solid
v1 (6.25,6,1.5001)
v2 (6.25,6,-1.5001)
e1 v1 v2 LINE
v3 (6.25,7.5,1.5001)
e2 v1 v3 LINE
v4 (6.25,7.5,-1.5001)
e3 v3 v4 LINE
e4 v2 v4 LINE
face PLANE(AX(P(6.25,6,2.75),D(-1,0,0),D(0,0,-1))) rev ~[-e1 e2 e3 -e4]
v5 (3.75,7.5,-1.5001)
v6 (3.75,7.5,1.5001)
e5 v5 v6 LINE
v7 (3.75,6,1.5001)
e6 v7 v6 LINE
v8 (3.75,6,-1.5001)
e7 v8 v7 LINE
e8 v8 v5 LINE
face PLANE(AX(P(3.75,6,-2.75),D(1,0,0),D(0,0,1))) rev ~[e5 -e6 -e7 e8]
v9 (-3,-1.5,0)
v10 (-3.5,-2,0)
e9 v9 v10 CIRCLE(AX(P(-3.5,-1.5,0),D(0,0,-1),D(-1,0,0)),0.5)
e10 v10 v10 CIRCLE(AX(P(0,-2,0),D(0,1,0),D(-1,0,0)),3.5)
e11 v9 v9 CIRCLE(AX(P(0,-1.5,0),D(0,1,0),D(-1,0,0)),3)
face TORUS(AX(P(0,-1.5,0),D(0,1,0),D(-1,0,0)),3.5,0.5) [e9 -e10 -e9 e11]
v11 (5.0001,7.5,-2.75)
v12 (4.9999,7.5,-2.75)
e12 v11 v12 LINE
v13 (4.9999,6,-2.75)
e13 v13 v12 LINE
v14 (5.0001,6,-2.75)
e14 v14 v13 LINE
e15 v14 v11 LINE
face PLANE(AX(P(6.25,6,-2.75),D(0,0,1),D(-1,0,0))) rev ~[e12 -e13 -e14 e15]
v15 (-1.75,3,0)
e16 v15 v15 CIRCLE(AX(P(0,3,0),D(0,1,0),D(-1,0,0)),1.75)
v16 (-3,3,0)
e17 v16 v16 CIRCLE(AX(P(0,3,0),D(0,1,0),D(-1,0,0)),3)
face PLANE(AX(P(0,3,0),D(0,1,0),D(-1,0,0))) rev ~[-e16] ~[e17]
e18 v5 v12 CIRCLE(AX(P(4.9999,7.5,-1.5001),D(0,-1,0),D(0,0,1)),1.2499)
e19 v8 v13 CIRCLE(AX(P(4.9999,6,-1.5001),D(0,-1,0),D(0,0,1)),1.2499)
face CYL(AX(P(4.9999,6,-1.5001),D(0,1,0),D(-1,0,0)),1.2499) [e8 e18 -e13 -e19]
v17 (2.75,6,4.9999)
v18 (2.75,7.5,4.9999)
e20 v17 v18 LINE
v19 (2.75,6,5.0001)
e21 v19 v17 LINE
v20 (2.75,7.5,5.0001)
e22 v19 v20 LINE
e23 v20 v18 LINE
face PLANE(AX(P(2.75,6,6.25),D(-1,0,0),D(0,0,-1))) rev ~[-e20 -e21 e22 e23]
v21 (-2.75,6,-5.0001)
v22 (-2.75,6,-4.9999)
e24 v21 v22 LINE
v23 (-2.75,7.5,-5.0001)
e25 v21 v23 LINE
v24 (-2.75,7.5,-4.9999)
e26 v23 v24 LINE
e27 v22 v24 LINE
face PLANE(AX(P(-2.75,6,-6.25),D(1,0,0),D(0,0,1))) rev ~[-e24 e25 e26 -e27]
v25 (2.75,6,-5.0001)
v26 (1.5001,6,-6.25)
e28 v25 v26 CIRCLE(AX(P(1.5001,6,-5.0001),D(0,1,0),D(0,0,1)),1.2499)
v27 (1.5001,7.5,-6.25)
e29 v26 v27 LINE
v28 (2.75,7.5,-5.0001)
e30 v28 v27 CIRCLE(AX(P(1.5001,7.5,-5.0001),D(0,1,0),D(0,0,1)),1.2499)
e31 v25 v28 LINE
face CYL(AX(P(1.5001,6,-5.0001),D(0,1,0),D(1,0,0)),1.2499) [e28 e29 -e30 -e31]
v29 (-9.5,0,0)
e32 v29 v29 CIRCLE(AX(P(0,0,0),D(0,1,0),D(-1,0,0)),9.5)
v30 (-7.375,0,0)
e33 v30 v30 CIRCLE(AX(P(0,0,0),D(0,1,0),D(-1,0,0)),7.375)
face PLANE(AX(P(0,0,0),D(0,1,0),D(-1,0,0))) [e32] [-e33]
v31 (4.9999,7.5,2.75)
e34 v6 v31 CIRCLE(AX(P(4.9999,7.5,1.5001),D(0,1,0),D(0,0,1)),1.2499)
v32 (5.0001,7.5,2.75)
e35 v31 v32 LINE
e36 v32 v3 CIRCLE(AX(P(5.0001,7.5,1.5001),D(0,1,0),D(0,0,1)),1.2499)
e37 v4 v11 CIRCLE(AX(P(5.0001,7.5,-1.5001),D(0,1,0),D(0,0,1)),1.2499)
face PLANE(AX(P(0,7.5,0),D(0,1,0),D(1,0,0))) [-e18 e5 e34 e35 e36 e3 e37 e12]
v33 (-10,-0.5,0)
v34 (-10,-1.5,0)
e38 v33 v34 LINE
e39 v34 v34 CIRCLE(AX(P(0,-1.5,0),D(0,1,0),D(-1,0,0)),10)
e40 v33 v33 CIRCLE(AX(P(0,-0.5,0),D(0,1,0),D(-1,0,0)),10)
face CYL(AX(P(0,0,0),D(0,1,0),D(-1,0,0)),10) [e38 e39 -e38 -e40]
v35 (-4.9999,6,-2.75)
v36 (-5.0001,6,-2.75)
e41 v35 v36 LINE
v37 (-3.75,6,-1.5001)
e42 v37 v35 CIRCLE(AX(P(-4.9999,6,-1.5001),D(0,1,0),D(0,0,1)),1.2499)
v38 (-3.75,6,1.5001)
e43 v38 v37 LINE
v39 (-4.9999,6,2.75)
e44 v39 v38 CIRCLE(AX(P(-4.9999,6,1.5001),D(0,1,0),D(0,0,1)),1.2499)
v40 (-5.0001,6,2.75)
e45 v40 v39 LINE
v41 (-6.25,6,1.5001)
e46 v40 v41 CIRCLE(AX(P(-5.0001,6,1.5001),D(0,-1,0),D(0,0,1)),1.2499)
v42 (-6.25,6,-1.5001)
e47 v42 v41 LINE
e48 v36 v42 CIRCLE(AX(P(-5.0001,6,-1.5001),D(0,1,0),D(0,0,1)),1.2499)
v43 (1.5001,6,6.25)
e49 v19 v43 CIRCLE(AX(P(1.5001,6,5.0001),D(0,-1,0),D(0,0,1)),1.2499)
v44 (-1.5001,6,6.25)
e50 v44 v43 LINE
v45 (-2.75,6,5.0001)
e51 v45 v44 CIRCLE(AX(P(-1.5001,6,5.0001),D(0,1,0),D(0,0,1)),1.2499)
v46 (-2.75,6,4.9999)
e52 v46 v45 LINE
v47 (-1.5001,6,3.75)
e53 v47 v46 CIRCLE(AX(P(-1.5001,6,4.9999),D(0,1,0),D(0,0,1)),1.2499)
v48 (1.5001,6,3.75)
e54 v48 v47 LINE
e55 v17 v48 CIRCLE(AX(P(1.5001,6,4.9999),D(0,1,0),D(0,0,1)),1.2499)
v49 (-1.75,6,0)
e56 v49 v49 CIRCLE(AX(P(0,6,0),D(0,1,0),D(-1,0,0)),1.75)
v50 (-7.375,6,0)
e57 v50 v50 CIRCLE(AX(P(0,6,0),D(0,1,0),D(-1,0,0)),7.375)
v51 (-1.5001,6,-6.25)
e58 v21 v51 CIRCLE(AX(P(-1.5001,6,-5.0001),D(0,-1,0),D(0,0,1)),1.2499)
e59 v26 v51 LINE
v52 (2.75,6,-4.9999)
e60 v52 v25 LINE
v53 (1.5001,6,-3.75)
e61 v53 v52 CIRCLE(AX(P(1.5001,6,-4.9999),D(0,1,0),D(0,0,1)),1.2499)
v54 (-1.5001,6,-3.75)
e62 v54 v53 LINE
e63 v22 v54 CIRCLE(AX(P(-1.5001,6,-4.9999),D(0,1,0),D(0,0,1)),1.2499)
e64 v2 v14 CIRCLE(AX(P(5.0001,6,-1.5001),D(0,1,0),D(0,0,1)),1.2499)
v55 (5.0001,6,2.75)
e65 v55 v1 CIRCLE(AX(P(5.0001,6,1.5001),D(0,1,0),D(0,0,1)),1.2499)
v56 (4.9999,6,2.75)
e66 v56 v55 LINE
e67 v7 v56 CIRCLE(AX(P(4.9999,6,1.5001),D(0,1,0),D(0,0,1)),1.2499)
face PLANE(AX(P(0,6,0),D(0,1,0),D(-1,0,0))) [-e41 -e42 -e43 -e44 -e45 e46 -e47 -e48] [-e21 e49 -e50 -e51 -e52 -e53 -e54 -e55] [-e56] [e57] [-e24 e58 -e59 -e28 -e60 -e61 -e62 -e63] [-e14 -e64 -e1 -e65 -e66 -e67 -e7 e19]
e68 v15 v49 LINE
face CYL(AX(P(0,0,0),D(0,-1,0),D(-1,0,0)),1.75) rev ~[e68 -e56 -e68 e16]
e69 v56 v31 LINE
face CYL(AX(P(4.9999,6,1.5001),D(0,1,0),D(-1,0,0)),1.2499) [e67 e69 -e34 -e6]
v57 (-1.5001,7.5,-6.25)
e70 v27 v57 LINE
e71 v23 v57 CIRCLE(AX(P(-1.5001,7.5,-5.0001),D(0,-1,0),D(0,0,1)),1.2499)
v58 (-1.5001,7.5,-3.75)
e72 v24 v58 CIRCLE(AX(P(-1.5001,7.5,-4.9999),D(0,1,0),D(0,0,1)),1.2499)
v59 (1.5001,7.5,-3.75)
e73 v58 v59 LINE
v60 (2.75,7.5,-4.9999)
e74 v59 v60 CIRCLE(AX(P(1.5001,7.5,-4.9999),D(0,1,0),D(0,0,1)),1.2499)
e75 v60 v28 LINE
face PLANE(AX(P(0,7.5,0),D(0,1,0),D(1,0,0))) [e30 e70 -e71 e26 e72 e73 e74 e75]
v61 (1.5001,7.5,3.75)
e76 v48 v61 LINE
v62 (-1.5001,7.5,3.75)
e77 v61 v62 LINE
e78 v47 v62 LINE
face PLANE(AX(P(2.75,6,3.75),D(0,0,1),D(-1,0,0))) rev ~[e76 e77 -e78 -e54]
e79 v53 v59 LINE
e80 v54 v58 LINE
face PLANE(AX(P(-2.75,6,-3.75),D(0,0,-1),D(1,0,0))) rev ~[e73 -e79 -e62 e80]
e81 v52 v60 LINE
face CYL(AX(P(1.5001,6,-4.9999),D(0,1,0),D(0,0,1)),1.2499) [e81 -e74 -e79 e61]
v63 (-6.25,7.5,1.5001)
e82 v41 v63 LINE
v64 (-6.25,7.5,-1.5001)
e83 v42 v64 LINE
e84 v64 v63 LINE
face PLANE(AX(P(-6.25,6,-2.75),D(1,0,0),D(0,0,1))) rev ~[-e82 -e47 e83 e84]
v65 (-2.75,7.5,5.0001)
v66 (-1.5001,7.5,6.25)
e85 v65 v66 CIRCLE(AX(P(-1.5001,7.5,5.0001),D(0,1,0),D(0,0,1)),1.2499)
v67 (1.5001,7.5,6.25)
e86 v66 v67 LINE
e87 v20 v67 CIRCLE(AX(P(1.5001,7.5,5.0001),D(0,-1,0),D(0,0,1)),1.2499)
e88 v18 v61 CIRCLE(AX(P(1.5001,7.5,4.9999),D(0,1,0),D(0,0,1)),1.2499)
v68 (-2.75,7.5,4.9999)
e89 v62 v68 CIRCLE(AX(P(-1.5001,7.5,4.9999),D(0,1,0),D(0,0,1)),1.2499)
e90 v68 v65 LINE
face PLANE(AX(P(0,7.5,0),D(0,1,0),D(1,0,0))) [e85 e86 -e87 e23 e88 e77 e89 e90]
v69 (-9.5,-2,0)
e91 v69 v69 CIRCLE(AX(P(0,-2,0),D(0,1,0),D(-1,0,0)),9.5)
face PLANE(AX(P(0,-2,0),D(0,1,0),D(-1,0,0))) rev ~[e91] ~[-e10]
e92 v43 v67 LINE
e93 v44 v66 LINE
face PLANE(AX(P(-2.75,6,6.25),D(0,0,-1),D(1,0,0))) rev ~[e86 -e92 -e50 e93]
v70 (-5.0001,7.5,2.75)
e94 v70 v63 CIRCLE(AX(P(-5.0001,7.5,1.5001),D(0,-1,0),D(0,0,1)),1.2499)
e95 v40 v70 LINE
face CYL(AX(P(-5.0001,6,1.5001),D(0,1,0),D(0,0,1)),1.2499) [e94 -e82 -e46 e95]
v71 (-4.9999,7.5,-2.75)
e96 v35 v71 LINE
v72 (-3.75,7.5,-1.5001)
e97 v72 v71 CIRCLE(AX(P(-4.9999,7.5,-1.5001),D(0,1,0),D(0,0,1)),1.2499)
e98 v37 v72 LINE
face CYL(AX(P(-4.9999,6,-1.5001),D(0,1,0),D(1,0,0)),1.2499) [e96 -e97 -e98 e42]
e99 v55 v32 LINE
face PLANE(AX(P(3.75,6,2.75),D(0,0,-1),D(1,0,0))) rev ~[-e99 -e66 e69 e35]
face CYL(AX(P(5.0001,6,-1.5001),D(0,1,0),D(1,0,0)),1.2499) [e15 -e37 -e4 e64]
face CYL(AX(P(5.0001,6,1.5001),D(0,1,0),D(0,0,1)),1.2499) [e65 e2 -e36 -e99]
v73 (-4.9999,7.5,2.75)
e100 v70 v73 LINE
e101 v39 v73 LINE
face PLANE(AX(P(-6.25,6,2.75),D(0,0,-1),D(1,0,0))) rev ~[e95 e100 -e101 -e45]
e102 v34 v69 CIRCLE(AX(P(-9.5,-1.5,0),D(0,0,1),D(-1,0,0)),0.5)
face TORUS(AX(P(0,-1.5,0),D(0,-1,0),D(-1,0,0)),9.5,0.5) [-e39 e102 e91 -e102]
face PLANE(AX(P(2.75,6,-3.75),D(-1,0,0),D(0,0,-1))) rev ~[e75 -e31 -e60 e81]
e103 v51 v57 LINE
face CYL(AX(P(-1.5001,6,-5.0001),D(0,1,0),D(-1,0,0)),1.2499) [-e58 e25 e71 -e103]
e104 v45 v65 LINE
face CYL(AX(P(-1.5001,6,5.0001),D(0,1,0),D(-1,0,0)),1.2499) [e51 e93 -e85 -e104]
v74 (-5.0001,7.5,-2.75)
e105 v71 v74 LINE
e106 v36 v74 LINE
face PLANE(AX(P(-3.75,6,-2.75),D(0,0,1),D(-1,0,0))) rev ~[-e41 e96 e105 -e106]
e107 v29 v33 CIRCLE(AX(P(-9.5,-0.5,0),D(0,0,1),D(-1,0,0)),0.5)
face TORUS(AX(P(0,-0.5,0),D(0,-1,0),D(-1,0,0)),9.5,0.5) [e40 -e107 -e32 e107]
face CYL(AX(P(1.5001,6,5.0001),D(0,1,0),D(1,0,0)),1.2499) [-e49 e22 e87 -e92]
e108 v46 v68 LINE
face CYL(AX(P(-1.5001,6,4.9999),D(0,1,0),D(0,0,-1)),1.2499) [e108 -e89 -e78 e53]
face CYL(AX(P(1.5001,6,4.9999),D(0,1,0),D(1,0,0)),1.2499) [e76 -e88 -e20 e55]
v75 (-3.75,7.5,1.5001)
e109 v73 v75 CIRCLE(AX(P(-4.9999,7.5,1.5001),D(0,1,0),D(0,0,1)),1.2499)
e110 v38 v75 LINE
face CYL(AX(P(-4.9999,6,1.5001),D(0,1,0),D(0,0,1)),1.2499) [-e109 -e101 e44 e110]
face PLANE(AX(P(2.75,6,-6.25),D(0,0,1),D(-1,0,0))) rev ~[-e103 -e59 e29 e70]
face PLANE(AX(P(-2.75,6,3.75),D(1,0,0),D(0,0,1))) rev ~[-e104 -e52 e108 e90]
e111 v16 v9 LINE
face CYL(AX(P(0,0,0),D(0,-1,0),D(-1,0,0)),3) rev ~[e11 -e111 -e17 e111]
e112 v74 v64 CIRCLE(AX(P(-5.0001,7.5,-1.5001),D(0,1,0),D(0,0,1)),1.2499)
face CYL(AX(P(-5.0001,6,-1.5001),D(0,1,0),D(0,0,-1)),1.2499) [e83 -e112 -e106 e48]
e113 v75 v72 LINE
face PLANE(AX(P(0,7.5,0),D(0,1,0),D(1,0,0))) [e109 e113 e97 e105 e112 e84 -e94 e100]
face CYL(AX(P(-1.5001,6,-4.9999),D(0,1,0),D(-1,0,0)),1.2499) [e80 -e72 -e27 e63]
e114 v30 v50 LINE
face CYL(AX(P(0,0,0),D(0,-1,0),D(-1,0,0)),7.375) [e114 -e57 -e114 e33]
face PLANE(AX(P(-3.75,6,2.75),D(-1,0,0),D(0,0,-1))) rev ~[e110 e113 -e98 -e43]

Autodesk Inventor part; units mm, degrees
ref_plane "YZ Plane" through (0, 0, 0) normal (1, 0, 0) x (0, 1, 0)
ref_plane "XZ Plane" through (0, 0, 0) normal (0, 1, 0) x (-1, 0, 0)
ref_plane "XY Plane" through (0, 0, 0) normal (0, 0, 1) x (1, 0, 0)
sketch "Sketch1" plane through (0, 0, 0) normal (0, 1, 0) x (-1, 0, 0)
  circle A0 centre (0, 0) radius 7.375
  circle A1 centre (0, 0) radius 1.75
  circle A2 centre (0, 0) radius 10
  circle A3 centre (0, 0) radius 3
  dimension "d0" = 14.75
  dimension "d1" = 3.5
  dimension "d2" = 20
  dimension "d7" = 6
extrude "Extrusion1" add sketch "Sketch1" along normal blind 6 contours A0 | A3
extrude "Extrusion2" add sketch "Sketch1" against normal blind 2 contours A0 | A2
sketch "Sketch2" plane through (0, 6, 0) normal (0, 1, 0) x (1, 0, 0)
  line L0 (3.75, -2.75) -> (6.25, -2.75)
  line L1 (6.25, -2.75) -> (6.25, 2.75)
  line L2 (6.25, 2.75) -> (3.75, 2.75)
  line L3 (3.75, 2.75) -> (3.75, -2.75)
  line L4 (3.75, -2.75) -> (6.25, 2.75) construction
  line L5 (6.25, -2.75) -> (3.75, 2.75) construction
  line L6 (-2.75, 3.75) -> (2.75, 3.75)
  line L7 (2.75, 3.75) -> (2.75, 6.25)
  line L8 (2.75, 6.25) -> (-2.75, 6.25)
  line L9 (-2.75, 6.25) -> (-2.75, 3.75)
  line L10 (-3.75, -2.75) -> (-3.75, 2.75)
  line L11 (-3.75, 2.75) -> (-6.25, 2.75)
  line L12 (-6.25, 2.75) -> (-6.25, -2.75)
  line L13 (-6.25, -2.75) -> (-3.75, -2.75)
  line L14 (2.75, -3.75) -> (-2.75, -3.75)
  line L15 (-2.75, -3.75) -> (-2.75, -6.25)
  line L16 (-2.75, -6.25) -> (2.75, -6.25)
  line L17 (2.75, -6.25) -> (2.75, -3.75)
  point P0 (0, 0)
  point P1 (5, 0)
  dimension "d10" = 5.5
  dimension "d11" = 2.5
  dimension "d12" = 5
  dimension "d13" = 0
  dimension "d16" = 360
extrude "Extrusion4" add sketch "Sketch2" along normal blind 1.5
fillet "Fillet1" radius 1.25 16 edges at (6.25, 6.75, -2.75) (3.75, 6.75, -2.75) (6.25, 6.75, 2.75) (3.75, 6.75, 2.75) (2.75, 6.75, 3.75) (2.75, 6.75, 6.25) (-2.75, 6.75, 6.25) (-2.75, 6.75, 3.75) (-3.75, 6.75, 2.75) (-6.25, 6.75, 2.75) (-6.25, 6.75, -2.75) (-3.75, 6.75, -2.75) (-2.75, 6.75, -6.25) (-2.75, 6.75, -3.75) (2.75, 6.75, -6.25) (2.75, 6.75, -3.75)
fillet "Fillet2" radius 0.5 3 edges at (10, -2, 0) (10, 0, 0) (3, -2, 0)
extrude "Extrusion5" cut sketch "Sketch1" along normal blind 3 contours A3
equation "\"d0\" = ShaftDiameter"
equation "\"d1\" = HoleDiameter"
equation "\"d2\" = CapDiameter"
equation "\"d3\" = ShaftLength"
equation "\"d5\" = CapLength"
equation "\"d18\" = TabLength"
equation "\"CapDiameter\" = 20"
equation "\"HoleDiameter\" = 3.5"
equation "\"ShaftLength\" = FEMUR_HEIGHT"
equation "\"CapLength\" = 2"
equation "\"HoleLength\" = 5"
equation "\"TabLength\" = 1.5"
equation "\"ShaftDiameter\" = 14.75"
equation "\"FEMUR_HEIGHT\" = 6"
properties part number "AxleCap"
